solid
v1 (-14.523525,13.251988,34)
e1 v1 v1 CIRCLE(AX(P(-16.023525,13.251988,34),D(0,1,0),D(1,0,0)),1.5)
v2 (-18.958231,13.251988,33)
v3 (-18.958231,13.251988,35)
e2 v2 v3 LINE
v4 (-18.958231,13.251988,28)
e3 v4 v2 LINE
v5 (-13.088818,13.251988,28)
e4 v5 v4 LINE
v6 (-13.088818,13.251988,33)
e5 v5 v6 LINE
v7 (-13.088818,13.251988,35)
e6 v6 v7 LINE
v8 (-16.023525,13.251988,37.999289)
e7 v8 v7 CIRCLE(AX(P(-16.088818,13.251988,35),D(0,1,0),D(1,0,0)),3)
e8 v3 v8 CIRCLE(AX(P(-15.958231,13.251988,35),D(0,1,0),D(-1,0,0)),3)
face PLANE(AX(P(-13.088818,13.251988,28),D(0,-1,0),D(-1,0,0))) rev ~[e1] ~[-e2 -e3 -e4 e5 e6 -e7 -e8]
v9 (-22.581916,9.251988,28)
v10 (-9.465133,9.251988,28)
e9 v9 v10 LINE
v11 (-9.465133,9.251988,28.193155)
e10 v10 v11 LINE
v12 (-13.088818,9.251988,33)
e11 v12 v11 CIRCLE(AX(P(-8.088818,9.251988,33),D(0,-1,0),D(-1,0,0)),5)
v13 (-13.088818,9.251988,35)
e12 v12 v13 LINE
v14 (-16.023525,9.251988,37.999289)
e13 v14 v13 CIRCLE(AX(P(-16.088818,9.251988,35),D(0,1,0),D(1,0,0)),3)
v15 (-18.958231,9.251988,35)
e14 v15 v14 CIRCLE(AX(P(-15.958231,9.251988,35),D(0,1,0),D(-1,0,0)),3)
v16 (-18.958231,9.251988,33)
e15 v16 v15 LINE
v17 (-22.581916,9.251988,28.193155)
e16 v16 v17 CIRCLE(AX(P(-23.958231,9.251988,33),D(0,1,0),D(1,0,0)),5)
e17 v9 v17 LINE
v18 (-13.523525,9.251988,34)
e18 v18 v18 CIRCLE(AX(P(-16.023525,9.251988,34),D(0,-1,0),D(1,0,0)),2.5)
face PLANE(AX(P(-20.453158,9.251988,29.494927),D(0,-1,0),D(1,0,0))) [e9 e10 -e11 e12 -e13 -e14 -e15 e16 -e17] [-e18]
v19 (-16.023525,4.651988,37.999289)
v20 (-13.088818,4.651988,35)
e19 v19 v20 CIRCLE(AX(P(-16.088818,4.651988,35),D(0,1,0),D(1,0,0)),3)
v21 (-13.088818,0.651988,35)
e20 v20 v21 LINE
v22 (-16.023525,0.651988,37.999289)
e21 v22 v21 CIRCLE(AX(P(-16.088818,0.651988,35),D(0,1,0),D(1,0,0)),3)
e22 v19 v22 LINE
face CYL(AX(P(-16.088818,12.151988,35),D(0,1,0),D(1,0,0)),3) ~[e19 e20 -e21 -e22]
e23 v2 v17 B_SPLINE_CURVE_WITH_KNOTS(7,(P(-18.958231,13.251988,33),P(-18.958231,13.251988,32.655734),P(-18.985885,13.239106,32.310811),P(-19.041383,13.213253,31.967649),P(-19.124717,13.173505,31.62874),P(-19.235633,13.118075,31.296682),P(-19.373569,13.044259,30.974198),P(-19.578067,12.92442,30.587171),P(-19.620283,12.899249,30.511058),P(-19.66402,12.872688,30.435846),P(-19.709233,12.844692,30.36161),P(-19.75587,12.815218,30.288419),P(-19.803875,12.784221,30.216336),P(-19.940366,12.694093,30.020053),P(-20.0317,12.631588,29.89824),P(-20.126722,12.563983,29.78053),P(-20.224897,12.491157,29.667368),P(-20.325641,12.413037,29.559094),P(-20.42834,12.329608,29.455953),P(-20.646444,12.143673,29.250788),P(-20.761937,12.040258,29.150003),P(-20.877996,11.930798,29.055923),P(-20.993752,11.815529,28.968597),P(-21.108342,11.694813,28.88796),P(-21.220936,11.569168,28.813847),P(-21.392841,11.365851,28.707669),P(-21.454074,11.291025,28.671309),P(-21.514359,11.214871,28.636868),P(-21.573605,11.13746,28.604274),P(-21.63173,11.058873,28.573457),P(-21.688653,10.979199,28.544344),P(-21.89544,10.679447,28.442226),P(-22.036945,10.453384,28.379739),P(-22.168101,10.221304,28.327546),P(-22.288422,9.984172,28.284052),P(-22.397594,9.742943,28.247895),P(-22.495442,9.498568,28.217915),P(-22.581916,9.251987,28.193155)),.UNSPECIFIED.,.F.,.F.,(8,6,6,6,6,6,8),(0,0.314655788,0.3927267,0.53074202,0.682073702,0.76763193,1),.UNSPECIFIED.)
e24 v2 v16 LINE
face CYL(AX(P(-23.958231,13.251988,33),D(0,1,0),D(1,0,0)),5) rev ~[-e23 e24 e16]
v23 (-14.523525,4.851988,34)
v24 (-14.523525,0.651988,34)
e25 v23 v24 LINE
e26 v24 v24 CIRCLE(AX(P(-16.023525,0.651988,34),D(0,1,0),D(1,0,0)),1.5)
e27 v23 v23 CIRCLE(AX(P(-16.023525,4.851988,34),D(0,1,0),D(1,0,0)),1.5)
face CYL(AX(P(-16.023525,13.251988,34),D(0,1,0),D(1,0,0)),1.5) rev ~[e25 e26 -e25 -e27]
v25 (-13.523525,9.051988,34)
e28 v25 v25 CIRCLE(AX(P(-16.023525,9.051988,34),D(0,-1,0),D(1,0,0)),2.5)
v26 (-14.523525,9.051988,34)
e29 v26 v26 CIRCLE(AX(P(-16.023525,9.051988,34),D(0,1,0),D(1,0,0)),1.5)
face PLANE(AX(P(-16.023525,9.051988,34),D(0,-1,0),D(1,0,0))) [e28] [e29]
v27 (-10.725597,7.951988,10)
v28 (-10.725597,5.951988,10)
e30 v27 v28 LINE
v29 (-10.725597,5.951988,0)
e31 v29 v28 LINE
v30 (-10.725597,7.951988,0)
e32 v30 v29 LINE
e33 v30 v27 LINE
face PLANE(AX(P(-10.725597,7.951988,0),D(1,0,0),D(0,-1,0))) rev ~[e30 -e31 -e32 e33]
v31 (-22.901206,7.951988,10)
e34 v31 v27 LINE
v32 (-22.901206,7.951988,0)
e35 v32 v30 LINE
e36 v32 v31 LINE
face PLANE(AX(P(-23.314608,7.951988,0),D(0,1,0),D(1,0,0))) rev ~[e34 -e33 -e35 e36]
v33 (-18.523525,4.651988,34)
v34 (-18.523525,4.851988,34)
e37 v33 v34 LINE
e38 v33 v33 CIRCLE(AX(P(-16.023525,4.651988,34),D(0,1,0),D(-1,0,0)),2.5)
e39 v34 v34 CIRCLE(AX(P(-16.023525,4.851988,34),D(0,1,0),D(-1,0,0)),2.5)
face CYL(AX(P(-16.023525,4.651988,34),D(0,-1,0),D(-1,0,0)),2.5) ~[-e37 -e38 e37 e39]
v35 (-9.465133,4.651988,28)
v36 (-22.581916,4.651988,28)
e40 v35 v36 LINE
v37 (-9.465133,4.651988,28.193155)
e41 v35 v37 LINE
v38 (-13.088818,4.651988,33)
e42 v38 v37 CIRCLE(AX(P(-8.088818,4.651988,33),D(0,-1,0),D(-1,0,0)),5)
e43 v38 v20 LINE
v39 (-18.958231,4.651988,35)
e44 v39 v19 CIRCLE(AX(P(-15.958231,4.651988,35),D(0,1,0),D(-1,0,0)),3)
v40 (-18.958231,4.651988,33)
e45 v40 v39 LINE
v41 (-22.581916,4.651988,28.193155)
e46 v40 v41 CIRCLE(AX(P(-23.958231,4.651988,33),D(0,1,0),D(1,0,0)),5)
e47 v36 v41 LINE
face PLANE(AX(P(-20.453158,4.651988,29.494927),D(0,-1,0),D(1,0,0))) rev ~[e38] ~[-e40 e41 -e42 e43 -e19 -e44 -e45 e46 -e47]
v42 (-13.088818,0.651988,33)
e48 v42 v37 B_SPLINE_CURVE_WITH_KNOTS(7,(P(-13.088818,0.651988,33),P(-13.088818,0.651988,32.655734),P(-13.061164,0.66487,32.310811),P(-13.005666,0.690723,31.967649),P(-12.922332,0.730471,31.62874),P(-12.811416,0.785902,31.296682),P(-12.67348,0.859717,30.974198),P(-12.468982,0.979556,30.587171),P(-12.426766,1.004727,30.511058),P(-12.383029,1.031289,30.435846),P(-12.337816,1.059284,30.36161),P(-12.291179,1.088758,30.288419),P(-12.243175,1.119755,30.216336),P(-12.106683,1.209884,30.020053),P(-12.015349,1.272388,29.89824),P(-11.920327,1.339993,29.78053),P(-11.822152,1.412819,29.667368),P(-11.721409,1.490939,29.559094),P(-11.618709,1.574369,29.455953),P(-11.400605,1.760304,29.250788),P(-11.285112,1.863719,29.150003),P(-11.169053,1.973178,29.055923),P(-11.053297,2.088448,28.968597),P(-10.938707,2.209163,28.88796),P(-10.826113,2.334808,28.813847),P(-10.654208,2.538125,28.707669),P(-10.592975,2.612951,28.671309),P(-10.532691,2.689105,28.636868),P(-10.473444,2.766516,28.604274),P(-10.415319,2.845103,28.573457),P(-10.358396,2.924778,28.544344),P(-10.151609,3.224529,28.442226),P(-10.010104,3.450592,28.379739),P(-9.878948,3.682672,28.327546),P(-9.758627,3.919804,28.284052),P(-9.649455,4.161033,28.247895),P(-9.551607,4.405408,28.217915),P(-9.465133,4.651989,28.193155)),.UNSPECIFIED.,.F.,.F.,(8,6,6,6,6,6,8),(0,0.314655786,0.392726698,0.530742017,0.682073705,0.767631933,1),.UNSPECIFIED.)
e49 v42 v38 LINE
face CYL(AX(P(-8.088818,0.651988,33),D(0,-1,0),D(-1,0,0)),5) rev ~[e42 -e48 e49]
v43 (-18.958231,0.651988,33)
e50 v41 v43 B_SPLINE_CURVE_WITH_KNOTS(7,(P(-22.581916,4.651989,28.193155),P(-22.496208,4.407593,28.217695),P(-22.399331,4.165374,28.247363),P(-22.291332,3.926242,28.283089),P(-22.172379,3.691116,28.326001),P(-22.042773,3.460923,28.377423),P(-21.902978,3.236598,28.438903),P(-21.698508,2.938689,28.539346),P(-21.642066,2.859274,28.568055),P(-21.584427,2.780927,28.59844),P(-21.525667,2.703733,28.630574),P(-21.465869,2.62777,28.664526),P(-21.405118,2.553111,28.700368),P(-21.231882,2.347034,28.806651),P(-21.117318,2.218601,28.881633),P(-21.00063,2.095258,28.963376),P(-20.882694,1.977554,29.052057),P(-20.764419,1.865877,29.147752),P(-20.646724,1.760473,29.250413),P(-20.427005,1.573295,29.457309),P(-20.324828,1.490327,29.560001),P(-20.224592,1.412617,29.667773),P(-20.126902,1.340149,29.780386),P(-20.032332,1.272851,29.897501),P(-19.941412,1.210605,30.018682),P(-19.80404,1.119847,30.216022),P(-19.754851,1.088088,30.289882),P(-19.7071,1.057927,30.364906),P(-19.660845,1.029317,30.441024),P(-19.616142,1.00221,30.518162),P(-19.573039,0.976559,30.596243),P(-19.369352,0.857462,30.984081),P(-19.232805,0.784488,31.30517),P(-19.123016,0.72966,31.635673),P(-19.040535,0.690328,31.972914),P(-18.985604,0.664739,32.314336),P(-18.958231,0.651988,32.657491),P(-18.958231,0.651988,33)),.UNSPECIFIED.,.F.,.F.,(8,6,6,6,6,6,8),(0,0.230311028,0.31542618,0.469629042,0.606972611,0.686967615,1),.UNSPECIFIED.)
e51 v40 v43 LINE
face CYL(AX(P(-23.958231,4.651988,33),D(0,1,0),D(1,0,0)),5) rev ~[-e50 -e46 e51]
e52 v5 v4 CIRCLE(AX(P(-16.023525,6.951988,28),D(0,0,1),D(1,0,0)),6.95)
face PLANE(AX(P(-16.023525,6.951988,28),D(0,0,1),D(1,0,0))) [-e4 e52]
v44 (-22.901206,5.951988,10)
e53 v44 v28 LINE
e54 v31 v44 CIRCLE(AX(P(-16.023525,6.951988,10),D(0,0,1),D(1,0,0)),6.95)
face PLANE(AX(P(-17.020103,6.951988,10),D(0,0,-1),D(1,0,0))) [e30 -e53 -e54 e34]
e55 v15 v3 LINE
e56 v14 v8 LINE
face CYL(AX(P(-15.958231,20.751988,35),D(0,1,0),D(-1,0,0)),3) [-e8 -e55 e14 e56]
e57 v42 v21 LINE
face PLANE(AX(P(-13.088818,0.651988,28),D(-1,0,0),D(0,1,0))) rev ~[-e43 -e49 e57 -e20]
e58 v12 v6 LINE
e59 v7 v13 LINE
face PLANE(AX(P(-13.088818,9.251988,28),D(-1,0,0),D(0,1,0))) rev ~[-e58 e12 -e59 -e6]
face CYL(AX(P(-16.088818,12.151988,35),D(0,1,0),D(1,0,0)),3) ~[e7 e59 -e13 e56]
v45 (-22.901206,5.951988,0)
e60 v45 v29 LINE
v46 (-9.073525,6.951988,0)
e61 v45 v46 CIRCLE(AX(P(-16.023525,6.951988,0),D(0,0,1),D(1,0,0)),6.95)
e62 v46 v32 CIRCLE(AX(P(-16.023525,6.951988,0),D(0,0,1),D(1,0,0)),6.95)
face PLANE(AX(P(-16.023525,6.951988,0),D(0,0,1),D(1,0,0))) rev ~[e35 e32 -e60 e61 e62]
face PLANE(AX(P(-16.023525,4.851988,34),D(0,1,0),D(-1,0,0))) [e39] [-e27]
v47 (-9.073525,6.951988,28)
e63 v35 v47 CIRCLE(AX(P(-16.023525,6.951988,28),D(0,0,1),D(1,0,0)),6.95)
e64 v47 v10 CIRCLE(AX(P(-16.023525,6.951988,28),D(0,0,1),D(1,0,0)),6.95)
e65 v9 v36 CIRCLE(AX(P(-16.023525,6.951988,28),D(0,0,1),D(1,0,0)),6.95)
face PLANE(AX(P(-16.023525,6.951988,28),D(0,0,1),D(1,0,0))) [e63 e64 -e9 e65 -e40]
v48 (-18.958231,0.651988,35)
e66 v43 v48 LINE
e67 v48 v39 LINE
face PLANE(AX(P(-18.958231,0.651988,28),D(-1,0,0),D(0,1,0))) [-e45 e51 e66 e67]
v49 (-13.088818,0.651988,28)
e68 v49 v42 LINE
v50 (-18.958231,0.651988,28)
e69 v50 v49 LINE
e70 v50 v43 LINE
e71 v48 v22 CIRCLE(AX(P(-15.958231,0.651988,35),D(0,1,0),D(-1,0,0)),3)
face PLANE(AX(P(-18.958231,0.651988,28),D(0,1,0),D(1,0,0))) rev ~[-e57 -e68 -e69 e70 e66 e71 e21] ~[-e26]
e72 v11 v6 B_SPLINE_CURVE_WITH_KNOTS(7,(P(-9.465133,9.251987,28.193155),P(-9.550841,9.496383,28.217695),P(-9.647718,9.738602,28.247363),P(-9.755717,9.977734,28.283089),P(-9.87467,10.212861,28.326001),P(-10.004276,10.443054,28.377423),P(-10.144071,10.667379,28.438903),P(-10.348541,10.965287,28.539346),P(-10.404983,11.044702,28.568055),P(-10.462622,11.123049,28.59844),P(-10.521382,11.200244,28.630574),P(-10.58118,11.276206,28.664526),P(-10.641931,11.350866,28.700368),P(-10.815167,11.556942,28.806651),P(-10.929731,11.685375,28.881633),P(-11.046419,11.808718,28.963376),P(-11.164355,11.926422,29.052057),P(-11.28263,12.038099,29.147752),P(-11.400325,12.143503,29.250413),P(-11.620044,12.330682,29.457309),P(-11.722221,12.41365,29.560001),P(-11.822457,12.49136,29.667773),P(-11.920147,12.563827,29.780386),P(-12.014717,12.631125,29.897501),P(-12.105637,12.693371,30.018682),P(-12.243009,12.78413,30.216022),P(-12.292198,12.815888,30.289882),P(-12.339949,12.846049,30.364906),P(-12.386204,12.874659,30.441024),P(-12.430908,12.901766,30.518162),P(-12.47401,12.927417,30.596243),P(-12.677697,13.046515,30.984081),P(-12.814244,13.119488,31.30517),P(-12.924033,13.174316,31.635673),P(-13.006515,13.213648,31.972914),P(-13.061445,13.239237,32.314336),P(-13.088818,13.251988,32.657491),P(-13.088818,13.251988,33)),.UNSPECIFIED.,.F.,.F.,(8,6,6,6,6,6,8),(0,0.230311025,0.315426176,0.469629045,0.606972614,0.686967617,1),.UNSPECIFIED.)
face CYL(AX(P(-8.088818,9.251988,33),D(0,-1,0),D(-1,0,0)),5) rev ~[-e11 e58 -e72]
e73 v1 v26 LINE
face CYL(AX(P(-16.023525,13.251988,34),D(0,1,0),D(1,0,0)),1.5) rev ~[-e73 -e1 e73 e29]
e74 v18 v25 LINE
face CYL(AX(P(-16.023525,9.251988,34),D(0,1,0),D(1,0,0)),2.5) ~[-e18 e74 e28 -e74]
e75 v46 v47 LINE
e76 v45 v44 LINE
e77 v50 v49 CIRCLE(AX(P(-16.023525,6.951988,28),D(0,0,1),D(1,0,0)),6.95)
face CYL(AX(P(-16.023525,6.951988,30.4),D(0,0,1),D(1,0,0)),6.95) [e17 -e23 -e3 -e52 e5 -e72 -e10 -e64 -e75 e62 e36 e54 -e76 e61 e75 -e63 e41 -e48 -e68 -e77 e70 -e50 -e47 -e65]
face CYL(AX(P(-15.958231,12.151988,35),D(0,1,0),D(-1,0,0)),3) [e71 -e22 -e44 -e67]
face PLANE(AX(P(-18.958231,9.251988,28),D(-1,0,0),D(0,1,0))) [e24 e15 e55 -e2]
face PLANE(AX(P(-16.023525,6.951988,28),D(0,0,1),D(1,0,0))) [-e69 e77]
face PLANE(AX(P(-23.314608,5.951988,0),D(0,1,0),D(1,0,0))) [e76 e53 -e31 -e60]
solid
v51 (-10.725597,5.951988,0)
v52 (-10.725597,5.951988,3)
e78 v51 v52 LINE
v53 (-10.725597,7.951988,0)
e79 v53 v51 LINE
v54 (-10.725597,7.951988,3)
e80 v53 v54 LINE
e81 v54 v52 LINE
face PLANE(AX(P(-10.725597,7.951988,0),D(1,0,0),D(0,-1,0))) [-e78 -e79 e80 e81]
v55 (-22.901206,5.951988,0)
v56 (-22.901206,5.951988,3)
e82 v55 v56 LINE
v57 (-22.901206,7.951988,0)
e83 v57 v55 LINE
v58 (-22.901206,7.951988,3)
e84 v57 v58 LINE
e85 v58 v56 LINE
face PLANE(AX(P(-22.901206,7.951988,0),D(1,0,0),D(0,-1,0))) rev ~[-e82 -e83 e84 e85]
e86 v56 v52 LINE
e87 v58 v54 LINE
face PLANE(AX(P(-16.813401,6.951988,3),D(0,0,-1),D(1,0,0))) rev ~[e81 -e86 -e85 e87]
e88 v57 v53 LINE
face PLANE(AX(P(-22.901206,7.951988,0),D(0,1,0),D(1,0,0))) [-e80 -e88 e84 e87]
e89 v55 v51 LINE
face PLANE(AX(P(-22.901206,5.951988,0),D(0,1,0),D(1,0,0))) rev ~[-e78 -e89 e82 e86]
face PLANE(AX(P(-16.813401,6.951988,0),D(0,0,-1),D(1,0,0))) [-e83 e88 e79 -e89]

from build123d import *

# Parameters (mm, degrees)
F0_R         = 6.95
F1_DEPTH     = 28
F2_W         = 2.9347061182
F2_H         = 4
F3_DEPTH     = 10
F4_T1_DEPTH  = 19
F4_T3_DEPTH  = 19
F5_T4_DEPTH  = 4
F5_S5_R      = 6.95
F5_T6_DEPTH  = 6
F5_T10_DEPTH = 4
F5_S11_R     = 6.95
F5_T12_DEPTH = 6
F5_T16_DEPTH = 4
F5_S17_R     = 6.95
F5_T18_DEPTH = 6
F5_T22_DEPTH = 4
F5_S23_R     = 6.95
F5_T24_DEPTH = 6
F7_W         = 12.5890113413
F7_H         = 2
F8_DEPTH     = 10
F9_W         = 12.1756089176
F9_H         = 2
F10_DEPTH    = 3
F11_R        = 2.5
F12_DEPTH    = 0.2
F13_R        = 2.5
F14_DEPTH    = 0.2
F15_DEPTH    = 13.2510001


# Not quite as in the source:
# - a fillet or chamfer that OpenCascade refuses, or shapes differently, is made with other operations: its cross-section is extruded or revolved along the edge and cut away or added


with BuildPart() as f1:
    # F0 (on Top) → F1 (new body)
    with BuildSketch(Plane.XY):
        with Locations((-16.023524542, 6.9519880981)):
            Circle(F0_R)
    extrude(amount=F1_DEPTH)

    # F2 (on face) → F3 (join)
    with BuildSketch(Plane.XY.offset(28)):
        with Locations((-17.490877601, 11.2519880981)):
            Rectangle(F2_W, F2_H)
        with Locations((-14.5561714829, 11.2519880981)):
            Rectangle(F2_W, F2_H)
        with Locations((-17.490877601, 2.6519880981)):
            Rectangle(F2_W, F2_H)
        with Locations((-14.5561714829, 2.6519880981)):
            Rectangle(F2_W, F2_H)
    extrude(amount=F3_DEPTH)

    # F4: fillet of radius 3 on 4 edges, made by hand

    # F4_s2 → F4_t1 (cut)
    with BuildSketch(Plane.XZ.offset(-12.1519880981)):
        with BuildLine():
            ThreePointArc((-13.0888184238, 35), (-13.9674980802, 37.1213203436), (-16.0888184238, 38))
            Line((-16.0888184238, 38), (-13.0888184238, 38))
            Line((-13.0888184238, 38), (-13.0888184238, 35))
        make_face()
        with BuildLine():
            ThreePointArc((-18.9582306601, 35), (-18.0795510037, 37.1213203436), (-15.9582306601, 38))
            Line((-15.9582306601, 38), (-18.9582306601, 38))
            Line((-18.9582306601, 38), (-18.9582306601, 35))
        make_face()
    extrude(amount=F4_T1_DEPTH, mode=Mode.SUBTRACT)

    # F4_s4 → F4_t3 (cut)
    with BuildSketch(Plane.XZ.offset(-20.7519880981)):
        with BuildLine():
            ThreePointArc((-13.0888184238, 35), (-13.9674980802, 37.1213203436), (-16.0888184238, 38))
            Line((-16.0888184238, 38), (-13.0888184238, 38))
            Line((-13.0888184238, 38), (-13.0888184238, 35))
        make_face()
        with BuildLine():
            ThreePointArc((-18.9582306601, 35), (-18.0795510037, 37.1213203436), (-15.9582306601, 38))
            Line((-15.9582306601, 38), (-18.9582306601, 38))
            Line((-18.9582306601, 38), (-18.9582306601, 35))
        make_face()
    extrude(amount=F4_T3_DEPTH, mode=Mode.SUBTRACT)

    # F5: fillet of radius 5 on 4 edges, made by hand


with BuildPart() as f5_tool2:
    # F5_s3 → F5_t4 (new body)
    with BuildSketch(Plane.XZ.offset(-0.6519880981)):
        with BuildLine():
            ThreePointArc((-13.0888184238, 33), (-11.6243523297, 29.4644660941), (-8.0888184238, 28))
            Line((-8.0888184238, 28), (-8.0888184238, 27.9))
            Line((-8.0888184238, 27.9), (-13.1888184238, 27.9))
            Line((-13.1888184238, 27.9), (-13.1888184238, 33))
            Line((-13.1888184238, 33), (-13.0888184238, 33))
        make_face()
    extrude(amount=-F5_T4_DEPTH)

    # F5_s5 → F5_t6 (intersect, symmetric)
    with BuildSketch(Plane.XY.offset(30.4)):
        with Locations((-16.023524542, 6.9519880981)):
            Circle(F5_S5_R)
    extrude(amount=F5_T6_DEPTH, both=True, mode=Mode.INTERSECT)


with BuildPart() as f1_1:
    add(f1.part)

    # F5_t1: union F5_tool2
    add(f5_tool2.part)


with BuildPart() as f5_tool8:
    # F5_s9 → F5_t10 (new body)
    with BuildSketch(Plane.XZ.offset(-9.2519880981)):
        with BuildLine():
            ThreePointArc((-13.0888184238, 33), (-11.6243523297, 29.4644660941), (-8.0888184238, 28))
            Line((-8.0888184238, 28), (-8.0888184238, 27.9))
            Line((-8.0888184238, 27.9), (-13.1888184238, 27.9))
            Line((-13.1888184238, 27.9), (-13.1888184238, 33))
            Line((-13.1888184238, 33), (-13.0888184238, 33))
        make_face()
    extrude(amount=-F5_T10_DEPTH)

    # F5_s11 → F5_t12 (intersect, symmetric)
    with BuildSketch(Plane.XY.offset(30.4)):
        with Locations((-16.023524542, 6.9519880981)):
            Circle(F5_S11_R)
    extrude(amount=F5_T12_DEPTH, both=True, mode=Mode.INTERSECT)


with BuildPart() as f1_2:
    add(f1_1.part)

    # F5_t7: union F5_tool8
    add(f5_tool8.part)


with BuildPart() as f5_tool14:
    # F5_s15 → F5_t16 (new body)
    with BuildSketch(Plane.XZ.offset(-13.2519880981)):
        with BuildLine():
            ThreePointArc((-18.9582306601, 33), (-20.4226967542, 29.4644660941), (-23.9582306601, 28))
            Line((-23.9582306601, 28), (-23.9582306601, 27.9))
            Line((-23.9582306601, 27.9), (-18.8582306601, 27.9))
            Line((-18.8582306601, 27.9), (-18.8582306601, 33))
            Line((-18.8582306601, 33), (-18.9582306601, 33))
        make_face()
    extrude(amount=F5_T16_DEPTH)

    # F5_s17 → F5_t18 (intersect, symmetric)
    with BuildSketch(Plane.XY.offset(30.4)):
        with Locations((-16.023524542, 6.9519880981)):
            Circle(F5_S17_R)
    extrude(amount=F5_T18_DEPTH, both=True, mode=Mode.INTERSECT)


with BuildPart() as f1_3:
    add(f1_2.part)

    # F5_t13: union F5_tool14
    add(f5_tool14.part)


with BuildPart() as f5_tool20:
    # F5_s21 → F5_t22 (new body)
    with BuildSketch(Plane.XZ.offset(-4.6519880981)):
        with BuildLine():
            ThreePointArc((-18.9582306601, 33), (-20.4226967542, 29.4644660941), (-23.9582306601, 28))
            Line((-23.9582306601, 28), (-23.9582306601, 27.9))
            Line((-23.9582306601, 27.9), (-18.8582306601, 27.9))
            Line((-18.8582306601, 27.9), (-18.8582306601, 33))
            Line((-18.8582306601, 33), (-18.9582306601, 33))
        make_face()
    extrude(amount=F5_T22_DEPTH)

    # F5_s23 → F5_t24 (intersect, symmetric)
    with BuildSketch(Plane.XY.offset(30.4)):
        with Locations((-16.023524542, 6.9519880981)):
            Circle(F5_S23_R)
    extrude(amount=F5_T24_DEPTH, both=True, mode=Mode.INTERSECT)


with BuildPart() as f1_4:
    add(f1_3.part)

    # F5_t19: union F5_tool20
    add(f5_tool20.part)

    # F7 (on face) → F8 (cut)
    with BuildSketch(Plane(origin=(0, 0, 0), x_dir=(1, 0, 0), z_dir=(0, 0, -1))):
        with Locations((-17.0201025903, -6.9519880981)):
            Rectangle(F7_W, F7_H)
    extrude(amount=-F8_DEPTH, mode=Mode.SUBTRACT)

    # F11 (on face) → F12 (join)
    with BuildSketch(Plane(origin=(0, 4.6519880981, 0), x_dir=(-1, 0, 0), z_dir=(0, 1, 0))):
        with Locations((16.023524542, 34)):
            Circle(F11_R)
    extrude(amount=F12_DEPTH)

    # F13 (on face) → F14 (join)
    with BuildSketch(Plane.XZ.offset(-9.2519880981)):
        with Locations((-16.023524542, 34)):
            Circle(F13_R)
    extrude(amount=F14_DEPTH)

    # F6 (on face) → F15 (cut, through all)
    with BuildSketch(Plane(origin=(0, 13.2519880981, 0), x_dir=(-1, 0, 0), z_dir=(0, 1, 0))):
        with BuildLine():
            ThreePointArc((17.523524542, 34), (16.023524542, 35.5), (14.523524542, 34))
            Line((14.523524542, 34), (17.523524542, 34))
        make_face()
        with BuildLine():
            Line((17.523524542, 34), (14.523524542, 34))
            ThreePointArc((14.523524542, 34), (16.023524542, 32.5), (17.523524542, 34))
        make_face()
    extrude(amount=-F15_DEPTH, mode=Mode.SUBTRACT)


with BuildPart() as f10:
    # F9 (on face) → F10 (new body)
    with BuildSketch(Plane(origin=(0, 0, 0), x_dir=(1, 0, 0), z_dir=(0, 0, -1))):
        with Locations((-16.8134013785, -6.9519880981)):
            Rectangle(F9_W, F9_H)
    extrude(amount=-F10_DEPTH)


solid = Compound([f1_4.part, f10.part])
